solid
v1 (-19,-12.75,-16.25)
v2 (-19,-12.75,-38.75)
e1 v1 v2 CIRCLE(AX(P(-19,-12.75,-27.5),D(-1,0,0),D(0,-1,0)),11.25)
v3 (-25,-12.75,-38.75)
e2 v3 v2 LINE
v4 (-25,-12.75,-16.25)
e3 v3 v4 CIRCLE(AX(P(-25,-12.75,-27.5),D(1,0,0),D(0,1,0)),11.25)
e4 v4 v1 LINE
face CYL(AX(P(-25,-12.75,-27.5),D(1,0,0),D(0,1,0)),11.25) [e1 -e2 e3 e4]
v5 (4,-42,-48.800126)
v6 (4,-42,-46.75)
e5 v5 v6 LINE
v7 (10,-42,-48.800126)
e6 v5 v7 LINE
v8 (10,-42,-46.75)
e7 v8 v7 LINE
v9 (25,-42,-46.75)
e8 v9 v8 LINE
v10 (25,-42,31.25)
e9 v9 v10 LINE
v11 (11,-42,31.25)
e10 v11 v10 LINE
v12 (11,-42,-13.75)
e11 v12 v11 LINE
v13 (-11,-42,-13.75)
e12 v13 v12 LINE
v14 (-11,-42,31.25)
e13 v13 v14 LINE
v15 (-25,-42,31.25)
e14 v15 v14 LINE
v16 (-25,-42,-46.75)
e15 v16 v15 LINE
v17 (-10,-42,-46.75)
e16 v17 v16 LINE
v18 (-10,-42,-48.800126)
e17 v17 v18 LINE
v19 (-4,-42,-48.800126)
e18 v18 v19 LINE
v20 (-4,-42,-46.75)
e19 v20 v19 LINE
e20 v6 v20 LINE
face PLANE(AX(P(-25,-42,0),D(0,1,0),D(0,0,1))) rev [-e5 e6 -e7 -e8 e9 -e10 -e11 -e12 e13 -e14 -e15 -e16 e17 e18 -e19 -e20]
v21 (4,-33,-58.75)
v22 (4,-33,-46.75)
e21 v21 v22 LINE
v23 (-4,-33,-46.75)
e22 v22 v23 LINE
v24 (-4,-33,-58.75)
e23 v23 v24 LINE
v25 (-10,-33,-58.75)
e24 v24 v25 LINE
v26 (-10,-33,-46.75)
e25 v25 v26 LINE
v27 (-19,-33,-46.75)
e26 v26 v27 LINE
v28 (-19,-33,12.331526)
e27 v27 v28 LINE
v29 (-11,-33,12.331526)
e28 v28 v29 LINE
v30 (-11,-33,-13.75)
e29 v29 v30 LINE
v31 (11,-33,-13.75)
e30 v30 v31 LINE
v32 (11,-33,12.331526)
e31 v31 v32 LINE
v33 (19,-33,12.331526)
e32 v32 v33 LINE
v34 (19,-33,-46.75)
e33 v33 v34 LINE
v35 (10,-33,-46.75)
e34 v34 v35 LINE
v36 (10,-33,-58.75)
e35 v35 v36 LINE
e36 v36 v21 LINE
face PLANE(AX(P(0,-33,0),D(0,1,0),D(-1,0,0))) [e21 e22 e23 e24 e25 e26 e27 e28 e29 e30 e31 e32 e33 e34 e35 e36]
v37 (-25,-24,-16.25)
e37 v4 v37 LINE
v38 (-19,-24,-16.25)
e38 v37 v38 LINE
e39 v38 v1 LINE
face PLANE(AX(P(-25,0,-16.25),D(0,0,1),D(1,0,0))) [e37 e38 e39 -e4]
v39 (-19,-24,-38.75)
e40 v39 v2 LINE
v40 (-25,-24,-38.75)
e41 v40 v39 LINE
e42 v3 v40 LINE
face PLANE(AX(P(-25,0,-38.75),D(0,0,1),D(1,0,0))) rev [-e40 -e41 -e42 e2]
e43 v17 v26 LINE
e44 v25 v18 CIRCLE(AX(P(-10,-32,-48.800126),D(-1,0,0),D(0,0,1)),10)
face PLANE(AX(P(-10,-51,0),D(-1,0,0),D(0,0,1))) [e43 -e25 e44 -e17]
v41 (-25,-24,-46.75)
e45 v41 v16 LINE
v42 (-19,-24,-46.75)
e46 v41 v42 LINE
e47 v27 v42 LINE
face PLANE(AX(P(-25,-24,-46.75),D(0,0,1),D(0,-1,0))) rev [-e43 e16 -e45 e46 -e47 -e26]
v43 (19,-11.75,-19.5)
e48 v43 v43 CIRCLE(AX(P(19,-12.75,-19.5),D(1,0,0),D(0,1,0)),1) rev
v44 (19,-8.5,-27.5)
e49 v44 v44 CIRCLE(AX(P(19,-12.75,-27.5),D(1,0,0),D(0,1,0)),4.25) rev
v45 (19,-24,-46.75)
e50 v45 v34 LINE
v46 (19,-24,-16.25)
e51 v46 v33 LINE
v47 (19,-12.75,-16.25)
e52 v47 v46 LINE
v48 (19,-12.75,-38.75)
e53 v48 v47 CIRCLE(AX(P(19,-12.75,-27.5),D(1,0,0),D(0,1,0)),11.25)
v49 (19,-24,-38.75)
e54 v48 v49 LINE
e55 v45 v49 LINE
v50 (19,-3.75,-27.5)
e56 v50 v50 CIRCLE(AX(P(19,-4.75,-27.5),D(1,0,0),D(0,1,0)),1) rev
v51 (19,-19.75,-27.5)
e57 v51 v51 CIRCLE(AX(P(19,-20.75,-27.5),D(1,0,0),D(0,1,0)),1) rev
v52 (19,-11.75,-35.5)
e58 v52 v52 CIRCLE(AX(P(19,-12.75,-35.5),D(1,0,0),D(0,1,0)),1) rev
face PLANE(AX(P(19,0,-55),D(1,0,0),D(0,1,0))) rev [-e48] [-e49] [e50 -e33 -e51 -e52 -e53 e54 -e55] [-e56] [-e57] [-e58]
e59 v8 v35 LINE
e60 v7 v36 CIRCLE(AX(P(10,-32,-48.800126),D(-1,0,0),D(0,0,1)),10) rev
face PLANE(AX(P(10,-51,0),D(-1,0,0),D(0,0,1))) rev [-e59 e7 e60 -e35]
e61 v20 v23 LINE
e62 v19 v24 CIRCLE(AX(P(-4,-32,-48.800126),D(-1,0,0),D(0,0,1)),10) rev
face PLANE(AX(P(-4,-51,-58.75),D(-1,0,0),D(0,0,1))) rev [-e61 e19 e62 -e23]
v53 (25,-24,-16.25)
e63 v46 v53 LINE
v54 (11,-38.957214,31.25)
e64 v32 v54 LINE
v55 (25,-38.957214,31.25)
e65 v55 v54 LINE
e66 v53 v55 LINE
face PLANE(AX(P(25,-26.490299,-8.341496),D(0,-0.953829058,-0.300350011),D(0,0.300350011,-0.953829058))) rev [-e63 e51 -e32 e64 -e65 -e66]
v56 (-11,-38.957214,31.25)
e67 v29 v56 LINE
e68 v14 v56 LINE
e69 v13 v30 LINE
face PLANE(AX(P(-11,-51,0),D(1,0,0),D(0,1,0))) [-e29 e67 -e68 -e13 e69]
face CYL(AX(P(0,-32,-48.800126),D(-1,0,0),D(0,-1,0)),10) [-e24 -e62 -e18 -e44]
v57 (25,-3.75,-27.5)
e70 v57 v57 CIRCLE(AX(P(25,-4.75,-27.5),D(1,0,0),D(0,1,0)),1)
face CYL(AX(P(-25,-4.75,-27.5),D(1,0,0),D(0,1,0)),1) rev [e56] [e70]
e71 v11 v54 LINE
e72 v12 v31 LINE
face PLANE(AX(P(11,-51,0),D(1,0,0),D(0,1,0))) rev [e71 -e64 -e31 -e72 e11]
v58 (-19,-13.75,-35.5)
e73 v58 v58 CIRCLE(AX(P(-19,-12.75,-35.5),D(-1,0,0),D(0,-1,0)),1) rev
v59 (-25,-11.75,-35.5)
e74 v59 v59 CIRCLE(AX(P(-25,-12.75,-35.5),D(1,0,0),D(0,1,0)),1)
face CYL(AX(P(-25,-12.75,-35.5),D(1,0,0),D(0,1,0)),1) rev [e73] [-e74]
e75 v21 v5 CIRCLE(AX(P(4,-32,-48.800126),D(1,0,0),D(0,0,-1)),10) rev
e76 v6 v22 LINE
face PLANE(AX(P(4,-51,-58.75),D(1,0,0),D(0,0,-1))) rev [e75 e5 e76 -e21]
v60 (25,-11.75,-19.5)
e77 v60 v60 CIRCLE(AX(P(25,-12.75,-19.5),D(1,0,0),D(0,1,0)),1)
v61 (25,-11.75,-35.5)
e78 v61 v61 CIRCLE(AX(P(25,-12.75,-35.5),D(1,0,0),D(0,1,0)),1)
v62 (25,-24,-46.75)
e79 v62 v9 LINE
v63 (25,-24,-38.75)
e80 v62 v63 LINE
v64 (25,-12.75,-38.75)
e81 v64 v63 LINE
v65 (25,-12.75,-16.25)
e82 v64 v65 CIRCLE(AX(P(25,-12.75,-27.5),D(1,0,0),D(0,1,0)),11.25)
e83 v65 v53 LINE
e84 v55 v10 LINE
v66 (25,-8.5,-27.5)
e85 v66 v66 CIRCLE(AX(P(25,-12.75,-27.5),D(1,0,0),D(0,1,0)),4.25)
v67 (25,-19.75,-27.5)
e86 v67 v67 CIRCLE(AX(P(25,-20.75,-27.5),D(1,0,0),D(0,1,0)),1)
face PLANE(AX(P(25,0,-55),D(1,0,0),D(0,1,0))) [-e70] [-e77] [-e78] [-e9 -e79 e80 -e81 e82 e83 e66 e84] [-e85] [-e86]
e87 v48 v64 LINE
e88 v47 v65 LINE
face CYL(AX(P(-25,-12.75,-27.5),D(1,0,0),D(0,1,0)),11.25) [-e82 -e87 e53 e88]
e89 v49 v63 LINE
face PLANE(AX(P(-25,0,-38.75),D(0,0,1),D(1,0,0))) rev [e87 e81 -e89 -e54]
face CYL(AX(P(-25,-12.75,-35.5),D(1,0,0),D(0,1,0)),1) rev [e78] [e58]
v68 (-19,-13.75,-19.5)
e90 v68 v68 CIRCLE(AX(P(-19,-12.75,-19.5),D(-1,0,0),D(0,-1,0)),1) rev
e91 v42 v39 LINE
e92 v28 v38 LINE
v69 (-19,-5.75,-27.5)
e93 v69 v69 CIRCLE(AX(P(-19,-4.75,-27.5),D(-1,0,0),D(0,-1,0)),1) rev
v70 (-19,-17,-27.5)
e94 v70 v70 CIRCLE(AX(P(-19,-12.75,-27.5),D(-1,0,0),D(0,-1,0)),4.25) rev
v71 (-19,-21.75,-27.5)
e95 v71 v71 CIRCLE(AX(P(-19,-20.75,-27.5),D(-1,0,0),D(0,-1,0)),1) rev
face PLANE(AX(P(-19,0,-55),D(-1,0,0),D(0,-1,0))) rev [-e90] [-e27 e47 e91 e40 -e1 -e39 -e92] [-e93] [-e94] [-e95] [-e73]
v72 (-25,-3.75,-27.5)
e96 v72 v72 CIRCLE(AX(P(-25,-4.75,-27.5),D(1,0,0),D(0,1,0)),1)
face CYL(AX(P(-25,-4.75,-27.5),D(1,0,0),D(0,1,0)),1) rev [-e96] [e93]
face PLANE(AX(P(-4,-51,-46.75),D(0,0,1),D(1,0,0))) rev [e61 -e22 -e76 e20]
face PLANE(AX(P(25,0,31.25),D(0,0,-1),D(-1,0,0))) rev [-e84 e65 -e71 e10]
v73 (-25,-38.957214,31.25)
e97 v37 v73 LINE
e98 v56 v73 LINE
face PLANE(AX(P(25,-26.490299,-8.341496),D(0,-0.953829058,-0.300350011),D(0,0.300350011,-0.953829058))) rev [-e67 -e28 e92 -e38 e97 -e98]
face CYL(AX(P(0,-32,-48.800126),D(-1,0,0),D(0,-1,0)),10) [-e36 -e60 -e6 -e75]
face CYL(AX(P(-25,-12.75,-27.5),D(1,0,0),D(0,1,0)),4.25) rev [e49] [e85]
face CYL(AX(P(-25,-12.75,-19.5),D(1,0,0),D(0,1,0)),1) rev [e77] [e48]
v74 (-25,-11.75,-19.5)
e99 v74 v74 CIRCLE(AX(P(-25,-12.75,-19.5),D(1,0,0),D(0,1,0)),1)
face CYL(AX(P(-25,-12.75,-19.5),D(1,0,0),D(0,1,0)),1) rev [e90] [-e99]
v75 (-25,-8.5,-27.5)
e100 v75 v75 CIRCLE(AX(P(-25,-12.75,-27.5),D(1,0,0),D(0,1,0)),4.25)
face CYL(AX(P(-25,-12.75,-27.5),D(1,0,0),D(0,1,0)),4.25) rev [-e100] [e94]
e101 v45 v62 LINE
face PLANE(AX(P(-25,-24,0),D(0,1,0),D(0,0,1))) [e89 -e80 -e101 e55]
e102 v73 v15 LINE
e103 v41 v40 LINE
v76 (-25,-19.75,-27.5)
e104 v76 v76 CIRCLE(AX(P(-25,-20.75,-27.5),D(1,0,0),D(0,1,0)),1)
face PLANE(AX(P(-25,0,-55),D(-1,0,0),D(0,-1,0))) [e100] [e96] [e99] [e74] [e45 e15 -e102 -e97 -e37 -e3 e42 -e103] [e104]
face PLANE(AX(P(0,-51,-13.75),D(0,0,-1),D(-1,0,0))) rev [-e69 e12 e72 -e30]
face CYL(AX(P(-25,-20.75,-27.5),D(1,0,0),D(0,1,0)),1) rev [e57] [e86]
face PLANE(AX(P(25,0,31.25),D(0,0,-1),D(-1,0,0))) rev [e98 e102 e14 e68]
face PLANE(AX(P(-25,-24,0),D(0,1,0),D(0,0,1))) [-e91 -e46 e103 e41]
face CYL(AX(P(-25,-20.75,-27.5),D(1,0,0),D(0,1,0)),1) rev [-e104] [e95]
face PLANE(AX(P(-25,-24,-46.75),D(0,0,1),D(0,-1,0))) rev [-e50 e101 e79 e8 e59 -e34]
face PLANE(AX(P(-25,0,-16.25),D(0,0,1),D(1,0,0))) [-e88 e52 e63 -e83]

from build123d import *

# Parameters (mm, degrees)
SKETCH1_W           = 50
SKETCH1_H           = 170
BOSS_EXTRUDE1_DEPTH = 55
SKETCH2_W           = 34
SKETCH2_H           = 27
CUT_EXTRUDE1_DEPTH  = 181.416185527
SKETCH3_W           = 10
SKETCH3_H           = 24
SKETCH3_R           = 4.25
SKETCH3_R_2         = 1
CUT_EXTRUDE2_DEPTH  = 186.539753153
SKETCH4_W           = 2
SKETCH4_H           = 24
CUT_EXTRUDE3_DEPTH  = 178.623196683
SKETCH5_W           = 6.25
SKETCH5_H           = 11.25
CUT_EXTRUDE4_DEPTH  = 186.539753153
SKETCH6_W           = 38
SKETCH6_H           = 10
CUT_EXTRUDE5_DEPTH  = 181.416185527
SKETCH8_W           = 13.25
SKETCH8_H           = 2.25
CUT_EXTRUDE7_DEPTH  = 186.539753153
SKETCH9_W           = 34
SKETCH9_H           = 35.25
CUT_EXTRUDE8_DEPTH  = 179.297679458
SKETCH11_W          = 13.25
SKETCH11_H          = 20.25
CUT_EXTRUDE9_DEPTH  = 184.480414486
SKETCH12_W          = 28.5
SKETCH12_H          = 15
BOSS_EXTRUDE2_DEPTH = 8
SKETCH14_W          = 34
SKETCH14_H          = 15
SKETCH14_H_2        = 10.25
BOSS_EXTRUDE3_DEPTH = 13.25
SKETCH16_R          = 4.5
SKETCH16_R_2        = 2.5
CUT_EXTRUDE13_DEPTH = 8
SKETCH17_R          = 4.5
SKETCH17_W          = 55
SKETCH17_H          = 10.25
CUT_EXTRUDE15_DEPTH = 175.384811552
SKETCH18_W          = 71.25
SKETCH18_H          = 27.5
SKETCH18_W_2        = 13.75
SKETCH18_W_3        = 16.25
BOSS_EXTRUDE4_DEPTH = 50
SKETCH19_W          = 38
SKETCH19_H          = 7
CUT_EXTRUDE16_DEPTH = 152.25227271
SKETCH20_W          = 57.5
SKETCH20_H          = 27.5
CUT_EXTRUDE17_DEPTH = 102.137591923
CUT_EXTRUDE18_DEPTH = 100.39221549
SKETCH22_W          = 82.5
SKETCH22_H          = 2.5
BOSS_EXTRUDE5_DEPTH = 50
SKETCH24_W          = 22
SKETCH24_H          = 17
CUT_EXTRUDE19_DEPTH = 101.710289941
SKETCH25_W          = 38
SKETCH25_H          = 38.136363636
CUT_EXTRUDE20_DEPTH = 10
SKETCH27_W          = 38
SKETCH27_H          = 60.136363636
BOSS_EXTRUDE6_DEPTH = 8.6
SKETCH29_W          = 38
SKETCH29_H          = 1.4
CUT_EXTRUDE21_DEPTH = 85.601313414
BOSS_EXTRUDE7_DEPTH = 50
SKETCH31_W          = 38
SKETCH31_H          = 17
CUT_EXTRUDE22_DEPTH = 117.365802537
SKETCH32_W          = 100
SKETCH32_H          = 3
CUT_EXTRUDE23_DEPTH = 101.710289941
SKETCH33_W          = 20
SKETCH33_H          = 10
SKETCH33_W_2        = 22
SKETCH33_H_2        = 45
CUT_EXTRUDE24_DEPTH = 84.137311118
SKETCH34_W          = 8
SKETCH34_H          = 12
CUT_EXTRUDE25_DEPTH = 76.0787087
BOSS_EXTRUDE8_DEPTH = 8
SKETCH37_W          = 78
SKETCH37_H          = 9
SKETCH37_W_2        = 12
CUT_EXTRUDE27_DEPTH = 93.48006542
FILLET1_R           = 10


with BuildPart() as part:
    # Sketch1 → Boss-Extrude1 (new body)
    with BuildSketch(Plane.XY):
        with Locations((0, -85)):
            Rectangle(SKETCH1_W, SKETCH1_H)
    extrude(amount=-BOSS_EXTRUDE1_DEPTH)

    # Sketch2 → Cut-Extrude1 (cut, through all)
    with BuildSketch(Plane.XY):
        with Locations((0, -13.5)):
            Rectangle(SKETCH2_W, SKETCH2_H)
    extrude(amount=-CUT_EXTRUDE1_DEPTH, mode=Mode.SUBTRACT)

    # Sketch3 → Cut-Extrude2 (cut, through all)
    with BuildSketch(Plane(origin=(25, 0, 0), x_dir=(0, 0, -1), z_dir=(1, 0, 0))):
        with Locations((50, -12)):
            Rectangle(SKETCH3_W, SKETCH3_H)
        with Locations((5, -12)):
            Rectangle(SKETCH3_W, SKETCH3_H)
        with Locations(Location((27.5, -12.75, 0), (0, 0, 90))):
            Circle(SKETCH3_R)
        with Locations(Location((35.5, -12.75, 0), (0, 0, 90))):
            Circle(SKETCH3_R_2)
        with Locations(Location((27.5, -4.75, 0), (0, 0, 90))):
            Circle(SKETCH3_R_2)
        with Locations(Location((27.5, -20.75, 0), (0, 0, 90))):
            Circle(SKETCH3_R_2)
        with Locations(Location((19.5, -12.75, 0), (0, 0, 90))):
            Circle(SKETCH3_R_2)
    extrude(amount=-CUT_EXTRUDE2_DEPTH, mode=Mode.SUBTRACT)

    # Sketch4 → Cut-Extrude3 (cut, through all)
    with BuildSketch(Plane.XY.offset(-10)):
        with Locations((-18, -12)):
            Rectangle(SKETCH4_W, SKETCH4_H)
        with Locations((18, -12)):
            Rectangle(SKETCH4_W, SKETCH4_H)
    extrude(amount=-CUT_EXTRUDE3_DEPTH, mode=Mode.SUBTRACT)

    # Sketch5 → Cut-Extrude4 (cut, through all)
    with BuildSketch(Plane(origin=(25, 0, 0), x_dir=(0, 0, -1), z_dir=(1, 0, 0))):
        with BuildLine():
            Line((45, 0), (10, 0))
            Line((10, 0), (10, -12.75))
            Line((10, -12.75), (16.25, -12.75))
            ThreePointArc((16.25, -12.75), (27.5, -1.5), (38.75, -12.75))
            Line((38.75, -12.75), (45, -12.75))
            Line((45, -12.75), (45, 0))
        make_face()
        with Locations((13.125, -18.375)):
            Rectangle(SKETCH5_W, SKETCH5_H)
        with Locations((41.875, -18.375)):
            Rectangle(SKETCH5_W, SKETCH5_H)
    extrude(amount=-CUT_EXTRUDE4_DEPTH, mode=Mode.SUBTRACT)

    # Sketch6 → Cut-Extrude5 (cut, through all)
    with BuildSketch(Plane.XY):
        with Locations((0, -29)):
            Rectangle(SKETCH6_W, SKETCH6_H)
    extrude(amount=-CUT_EXTRUDE5_DEPTH, mode=Mode.SUBTRACT)

    # Sketch8 → Cut-Extrude7 (cut, through all)
    with BuildSketch(Plane(origin=(25, 0, 0), x_dir=(0, 0, -1), z_dir=(1, 0, 0))):
        with BuildLine():
            Line((27.5, -157.5), (27.5, -132.5))
            Line((27.5, -132.5), (13.25, -132.5))
            Line((13.25, -132.5), (13.25, -167.75))
            Line((13.25, -167.75), (17.25, -167.75))
            ThreePointArc((17.25, -167.75), (20.252155493, -160.502155493), (27.5, -157.5))
        make_face()
        with BuildLine():
            Line((41.75, -167.75), (41.75, -132.5))
            Line((41.75, -132.5), (27.5, -132.5))
            Line((27.5, -132.5), (27.5, -157.5))
            ThreePointArc((27.5, -157.5), (34.747844507, -160.502155493), (37.75, -167.75))
            Line((37.75, -167.75), (41.75, -167.75))
        make_face()
        with Locations((48.375, -168.875)):
            Rectangle(SKETCH8_W, SKETCH8_H)
        with Locations((6.625, -168.875)):
            Rectangle(SKETCH8_W, SKETCH8_H)
        with BuildLine():
            Line((17.25, -167.75), (13.25, -167.75))
            Line((13.25, -167.75), (13.25, -170))
            Line((13.25, -170), (17.5, -170))
            ThreePointArc((17.5, -170), (17.31269172, -168.881923142), (17.25, -167.75))
        make_face()
        with BuildLine():
            Line((41.75, -170), (41.75, -167.75))
            Line((41.75, -167.75), (37.75, -167.75))
            ThreePointArc((37.75, -167.75), (37.68730828, -168.881923142), (37.5, -170))
            Line((37.5, -170), (41.75, -170))
        make_face()
        with BuildLine():
            Line((27.5, -167.75), (27.5, -157.5))
            ThreePointArc((27.5, -157.5), (20.252155493, -160.502155493), (17.25, -167.75))
            Line((17.25, -167.75), (27.5, -167.75))
        make_face()
        with BuildLine():
            ThreePointArc((37.75, -167.75), (34.747844507, -160.502155493), (27.5, -157.5))
            Line((27.5, -157.5), (27.5, -167.75))
            Line((27.5, -167.75), (37.75, -167.75))
        make_face()
        with BuildLine():
            Line((27.5, -170), (27.5, -167.75))
            Line((27.5, -167.75), (17.25, -167.75))
            ThreePointArc((17.25, -167.75), (17.31269172, -168.881923142), (17.5, -170))
            Line((17.5, -170), (27.5, -170))
        make_face()
        with BuildLine():
            ThreePointArc((37.5, -170), (37.68730828, -168.881923142), (37.75, -167.75))
            Line((37.75, -167.75), (27.5, -167.75))
            Line((27.5, -167.75), (27.5, -170))
            Line((27.5, -170), (37.5, -170))
        make_face()
    extrude(amount=-CUT_EXTRUDE7_DEPTH, mode=Mode.SUBTRACT)

    # Sketch9 → Cut-Extrude8 (cut, through all)
    with BuildSketch(Plane.XY):
        with Locations((0, -150.125)):
            Rectangle(SKETCH9_W, SKETCH9_H)
    extrude(amount=-CUT_EXTRUDE8_DEPTH, mode=Mode.SUBTRACT)

    # Sketch11 → Cut-Extrude9 (cut, through all)
    with BuildSketch(Plane(origin=(25, 0, 0), x_dir=(0, 0, -1), z_dir=(1, 0, 0))):
        with BuildLine():
            ThreePointArc((17.25, -167.75), (20.252155493, -160.502155493), (27.5, -157.5))
            Line((27.5, -157.5), (27.5, -147.5))
            Line((27.5, -147.5), (13.25, -147.5))
            Line((13.25, -147.5), (13.25, -167.75))
            Line((13.25, -167.75), (17.25, -167.75))
        make_face()
        with BuildLine():
            Line((27.5, -147.5), (27.5, -157.5))
            ThreePointArc((27.5, -157.5), (34.747844507, -160.502155493), (37.75, -167.75))
            Line((37.75, -167.75), (41.75, -167.75))
            Line((41.75, -167.75), (41.75, -147.5))
            Line((41.75, -147.5), (27.5, -147.5))
        make_face()
        with Locations((48.375, -157.625)):
            Rectangle(SKETCH11_W, SKETCH11_H)
        with Locations((6.625, -157.625)):
            Rectangle(SKETCH11_W, SKETCH11_H)
    extrude(amount=-CUT_EXTRUDE9_DEPTH, mode=Mode.SUBTRACT)

    # Sketch12 → Boss-Extrude2 (add)
    with BuildSketch(Plane(origin=(25, 0, 0), x_dir=(0, 0, -1), z_dir=(1, 0, 0))):
        with Locations((27.5, -140)):
            Rectangle(SKETCH12_W, SKETCH12_H)
    boss_extrude2 = extrude(amount=-BOSS_EXTRUDE2_DEPTH)

    # Mirror1: Boss-Extrude2 across plane
    add(boss_extrude2.mirror(Plane(origin=(0, 0, 0), x_dir=(0, 0, 1), z_dir=(1, 0, 0))))

    # Sketch14 → Boss-Extrude3 (add)
    with BuildSketch(Plane.XY):
        with Locations((0, -140)):
            Rectangle(SKETCH14_W, SKETCH14_H)
        with Locations((0, -152.625)):
            Rectangle(SKETCH14_W, SKETCH14_H_2)
    boss_extrude3 = extrude(amount=-BOSS_EXTRUDE3_DEPTH)

    # Mirror2: Boss-Extrude3 across plane
    add(boss_extrude3.mirror(Plane.XY.offset(-27.5)))

    # Sketch16 → Cut-Extrude13 (cut)
    # profile 1 of 3: a face of its own
    with BuildSketch(Plane(origin=(25, 0, 0), x_dir=(0, 0, -1), z_dir=(1, 0, 0))):
        with Locations(Location((16.5, -135.75, 0), (0, 0, 90))):
            Circle(SKETCH16_R)
        with Locations((16.5, -135.75)):
            Circle(SKETCH16_R_2, mode=Mode.SUBTRACT)
    # profile 2 of 3: a face of its own
    with BuildSketch(Plane(origin=(25, 0, 0), x_dir=(0, 0, -1), z_dir=(1, 0, 0))):
        with Locations((16.5, -135.75)):
            Circle(SKETCH16_R_2)
    # profile 3 of 3: a face of its own
    with BuildSketch(Plane(origin=(25, 0, 0), x_dir=(0, 0, -1), z_dir=(1, 0, 0))):
        with Locations(Location((38.5, -135.75, 0), (0, 0, 90))):
            Circle(SKETCH16_R)
    cut_extrude13 = extrude(amount=-CUT_EXTRUDE13_DEPTH, mode=Mode.SUBTRACT)

    # Mirror3: Cut-Extrude13 across plane
    add(cut_extrude13.mirror(Plane(origin=(0, 0, 0), x_dir=(0, 0, 1), z_dir=(1, 0, 0))), mode=Mode.SUBTRACT)

    # Sketch17 → Cut-Extrude15 (cut, through all)
    # profile 1 of 4: a face of its own
    with BuildSketch(Plane(origin=(25, 0, 0), x_dir=(0, 0, -1), z_dir=(1, 0, 0))):
        Polygon((55, -51.5), (27.5, -51.5), (0, -51.5), (0, -147.5), (55, -147.5), align=None)
        with Locations((16.5, -135.75)):
            Circle(SKETCH17_R, mode=Mode.SUBTRACT)
        with Locations((38.5, -135.75)):
            Circle(SKETCH17_R, mode=Mode.SUBTRACT)
    # profile 2 of 4: a face of its own
    with BuildSketch(Plane(origin=(25, 0, 0), x_dir=(0, 0, -1), z_dir=(1, 0, 0))):
        with Locations((27.5, -152.625)):
            Rectangle(SKETCH17_W, SKETCH17_H)
    # profile 3 of 4: a face of its own
    with BuildSketch(Plane(origin=(25, 0, 0), x_dir=(0, 0, -1), z_dir=(1, 0, 0))):
        with Locations((38.5, -135.75)):
            Circle(SKETCH17_R)
    # profile 4 of 4: a face of its own
    with BuildSketch(Plane(origin=(25, 0, 0), x_dir=(0, 0, -1), z_dir=(1, 0, 0))):
        with Locations((16.5, -135.75)):
            Circle(SKETCH17_R)
    extrude(amount=-CUT_EXTRUDE15_DEPTH, mode=Mode.SUBTRACT)

    # Sketch18 → Boss-Extrude4 (add)
    with BuildSketch(Plane(origin=(25, 0, 0), x_dir=(0, 0, -1), z_dir=(1, 0, 0))):
        with Locations((-35.625, -37.75)):
            Rectangle(SKETCH18_W, SKETCH18_H)
        with Locations((61.875, -37.75)):
            Rectangle(SKETCH18_W_2, SKETCH18_H)
        Polygon((38.75, -51.5), (38.75, -24), (16.25, -24), (0, -24), (0, -51.5), align=None)
        with Locations((46.875, -37.75)):
            Rectangle(SKETCH18_W_3, SKETCH18_H)
    extrude(amount=-BOSS_EXTRUDE4_DEPTH)

    # Sketch19 → Cut-Extrude16 (cut, through all)
    with BuildSketch(Plane.XY.offset(71.25)):
        with Locations((0, -27.5)):
            Rectangle(SKETCH19_W, SKETCH19_H)
    extrude(amount=-CUT_EXTRUDE16_DEPTH, mode=Mode.SUBTRACT)

    # Sketch20 → Cut-Extrude17 (cut, through all)
    with BuildSketch(Plane(origin=(25, 0, 0), x_dir=(0, 0, -1), z_dir=(1, 0, 0))):
        with Locations((-42.5, -37.75)):
            Rectangle(SKETCH20_W, SKETCH20_H)
    extrude(amount=-CUT_EXTRUDE17_DEPTH, mode=Mode.SUBTRACT)

    # Sketch21 → Cut-Extrude18 (cut, through all)
    with BuildSketch(Plane(origin=(25, 0, 0), x_dir=(0, 0, -1), z_dir=(1, 0, 0))):
        Polygon((16.25, -24), (-13.75, -51.5), (-13.75, -24), align=None)
    extrude(amount=-CUT_EXTRUDE18_DEPTH, mode=Mode.SUBTRACT)

    # Sketch22 → Boss-Extrude5 (add)
    with BuildSketch(Plane(origin=(25, 0, 0), x_dir=(0, 0, -1), z_dir=(1, 0, 0))):
        with Locations((27.5, -52.75)):
            Rectangle(SKETCH22_W, SKETCH22_H)
    extrude(amount=-BOSS_EXTRUDE5_DEPTH)

    # Sketch24 → Cut-Extrude19 (cut, through all)
    with BuildSketch(Plane(origin=(25, 0, 0), x_dir=(0, 0, -1), z_dir=(1, 0, 0))):
        with Locations((57.75, -32.5)):
            Rectangle(SKETCH24_W, SKETCH24_H)
    extrude(amount=-CUT_EXTRUDE19_DEPTH, mode=Mode.SUBTRACT)

    # Sketch25 → Cut-Extrude20 (cut)
    with BuildSketch(Plane(origin=(0, -31, 0), x_dir=(1, 0, 0), z_dir=(0, 1, 0))):
        with Locations((0, 27.681818182)):
            Rectangle(SKETCH25_W, SKETCH25_H)
    extrude(amount=-CUT_EXTRUDE20_DEPTH, mode=Mode.SUBTRACT)

    # Sketch27 → Boss-Extrude6 (add)
    with BuildSketch(Plane(origin=(0, -41, 0), x_dir=(1, 0, 0), z_dir=(0, 1, 0))):
        with Locations((0, 38.681818182)):
            Rectangle(SKETCH27_W, SKETCH27_H)
    extrude(amount=BOSS_EXTRUDE6_DEPTH)

    # Sketch29 → Cut-Extrude21 (cut, through all)
    with BuildSketch(Plane(origin=(0, 0, -8.613636364), x_dir=(-1, 0, 0), z_dir=(0, 0, -1))):
        with Locations((0, -31.7)):
            Rectangle(SKETCH29_W, SKETCH29_H)
    extrude(amount=-CUT_EXTRUDE21_DEPTH, mode=Mode.SUBTRACT)

    # Sketch30 → Boss-Extrude7 (add)
    with BuildSketch(Plane.ZY.offset(25)):
        Polygon((31.25, -38.957214173), (-16.25, -24), (-7.086363636, -32.4), (13.75, -51.5), (13.75, -53.914428346), (31.25, -53.914428346), align=None)
        Polygon((-16.25, -24), (-16.25, -32.4), (-7.086363636, -32.4), align=None)
    extrude(amount=-BOSS_EXTRUDE7_DEPTH)

    # Sketch31 → Cut-Extrude22 (cut, through all)
    with BuildSketch(Plane(origin=(0, 0, -68.75), x_dir=(-1, 0, 0), z_dir=(0, 0, -1))):
        with Locations((0, -32.5)):
            Rectangle(SKETCH31_W, SKETCH31_H)
    extrude(amount=-CUT_EXTRUDE22_DEPTH, mode=Mode.SUBTRACT)

    # Sketch32 → Cut-Extrude23 (cut, through all)
    with BuildSketch(Plane(origin=(25, 0, 0), x_dir=(0, 0, -1), z_dir=(1, 0, 0))):
        with Locations((18.75, -52.5)):
            Rectangle(SKETCH32_W, SKETCH32_H)
    extrude(amount=-CUT_EXTRUDE23_DEPTH, mode=Mode.SUBTRACT)

    # Sketch33 → Cut-Extrude24 (cut, through all)
    with BuildSketch(Plane(origin=(0, -41, 0), x_dir=(1, 0, 0), z_dir=(0, 1, 0))):
        Polygon((-10, 68.75), (-25, 68.75), (-25, 46.75), (-19, 46.75), (-10, 46.75), (-10, 58.75), align=None)
        Polygon((25, 68.75), (10, 68.75), (10, 58.75), (10, 46.75), (19, 46.75), (25, 46.75), align=None)
        with Locations((0, 63.75)):
            Rectangle(SKETCH33_W, SKETCH33_H)
        with Locations((0, -8.75)):
            Rectangle(SKETCH33_W_2, SKETCH33_H_2)
    extrude(amount=-CUT_EXTRUDE24_DEPTH, mode=Mode.SUBTRACT)

    # Sketch34 → Cut-Extrude25 (cut, through all)
    with BuildSketch(Plane(origin=(0, -41, 0), x_dir=(1, 0, 0), z_dir=(0, 1, 0))):
        with Locations((0, 52.75)):
            Rectangle(SKETCH34_W, SKETCH34_H)
    extrude(amount=-CUT_EXTRUDE25_DEPTH, mode=Mode.SUBTRACT)

    # Sketch36 → Boss-Extrude8 (add)
    with BuildSketch(Plane(origin=(0, -41, 0), x_dir=(1, 0, 0), z_dir=(0, 1, 0))):
        Polygon((4, 58.75), (4, 46.75), (-4, 46.75), (-4, 58.75), (-10, 58.75), (-10, 46.75), (-19, 46.75), (-19, -31.25), (-11, -31.25), (-11, 13.75), (11, 13.75), (11, -31.25), (19, -31.25), (19, 46.75), (10, 46.75), (10, 58.75), align=None)
    extrude(amount=BOSS_EXTRUDE8_DEPTH)

    # Sketch37 → Cut-Extrude27 (cut, through all)
    with BuildSketch(Plane(origin=(25, 0, 0), x_dir=(0, 0, -1), z_dir=(1, 0, 0))):
        with Locations((7.75, -46.5)):
            Rectangle(SKETCH37_W, SKETCH37_H)
        Polygon((-31.25, -33), (-31.25, -38.957214173), (-12.331525614, -33), align=None)
        with Locations((52.75, -46.5)):
            Rectangle(SKETCH37_W_2, SKETCH37_H)
    extrude(amount=-CUT_EXTRUDE27_DEPTH, mode=Mode.SUBTRACT)

    # Fillet1
    # the kernel refuses this fillet: 10 mm, written as the material it takes off along each edge
    with BuildSketch(Plane(origin=(20.874685928, -42, -58.75), x_dir=(0, 0, 1), z_dir=(-1, 0, 0)), Plane(origin=(34.874685928, -42, -58.75), x_dir=(0, 0, 1), z_dir=(-1, 0, 0))) as fillet1_piece_1:
        with BuildLine():
            CenterArc((9.949874371, 10), FILLET1_R, 185.739170477, 84.260829523)
            Line((0, 9), (-0.198997487, 8.98))
            ThreePointArc((-0.198997487, 8.98), (-0.2, 4.5), (-0.2, 0))
            Line((-0.2, 0), (0, -0.2))
            Line((0, -0.2), (9.949874371, -0.2))
            Line((9.949874371, -0.2), (9.949874371, 0))
        make_face()
    extrude(amount=55.749371855, mode=Mode.SUBTRACT)


solid = part.part
